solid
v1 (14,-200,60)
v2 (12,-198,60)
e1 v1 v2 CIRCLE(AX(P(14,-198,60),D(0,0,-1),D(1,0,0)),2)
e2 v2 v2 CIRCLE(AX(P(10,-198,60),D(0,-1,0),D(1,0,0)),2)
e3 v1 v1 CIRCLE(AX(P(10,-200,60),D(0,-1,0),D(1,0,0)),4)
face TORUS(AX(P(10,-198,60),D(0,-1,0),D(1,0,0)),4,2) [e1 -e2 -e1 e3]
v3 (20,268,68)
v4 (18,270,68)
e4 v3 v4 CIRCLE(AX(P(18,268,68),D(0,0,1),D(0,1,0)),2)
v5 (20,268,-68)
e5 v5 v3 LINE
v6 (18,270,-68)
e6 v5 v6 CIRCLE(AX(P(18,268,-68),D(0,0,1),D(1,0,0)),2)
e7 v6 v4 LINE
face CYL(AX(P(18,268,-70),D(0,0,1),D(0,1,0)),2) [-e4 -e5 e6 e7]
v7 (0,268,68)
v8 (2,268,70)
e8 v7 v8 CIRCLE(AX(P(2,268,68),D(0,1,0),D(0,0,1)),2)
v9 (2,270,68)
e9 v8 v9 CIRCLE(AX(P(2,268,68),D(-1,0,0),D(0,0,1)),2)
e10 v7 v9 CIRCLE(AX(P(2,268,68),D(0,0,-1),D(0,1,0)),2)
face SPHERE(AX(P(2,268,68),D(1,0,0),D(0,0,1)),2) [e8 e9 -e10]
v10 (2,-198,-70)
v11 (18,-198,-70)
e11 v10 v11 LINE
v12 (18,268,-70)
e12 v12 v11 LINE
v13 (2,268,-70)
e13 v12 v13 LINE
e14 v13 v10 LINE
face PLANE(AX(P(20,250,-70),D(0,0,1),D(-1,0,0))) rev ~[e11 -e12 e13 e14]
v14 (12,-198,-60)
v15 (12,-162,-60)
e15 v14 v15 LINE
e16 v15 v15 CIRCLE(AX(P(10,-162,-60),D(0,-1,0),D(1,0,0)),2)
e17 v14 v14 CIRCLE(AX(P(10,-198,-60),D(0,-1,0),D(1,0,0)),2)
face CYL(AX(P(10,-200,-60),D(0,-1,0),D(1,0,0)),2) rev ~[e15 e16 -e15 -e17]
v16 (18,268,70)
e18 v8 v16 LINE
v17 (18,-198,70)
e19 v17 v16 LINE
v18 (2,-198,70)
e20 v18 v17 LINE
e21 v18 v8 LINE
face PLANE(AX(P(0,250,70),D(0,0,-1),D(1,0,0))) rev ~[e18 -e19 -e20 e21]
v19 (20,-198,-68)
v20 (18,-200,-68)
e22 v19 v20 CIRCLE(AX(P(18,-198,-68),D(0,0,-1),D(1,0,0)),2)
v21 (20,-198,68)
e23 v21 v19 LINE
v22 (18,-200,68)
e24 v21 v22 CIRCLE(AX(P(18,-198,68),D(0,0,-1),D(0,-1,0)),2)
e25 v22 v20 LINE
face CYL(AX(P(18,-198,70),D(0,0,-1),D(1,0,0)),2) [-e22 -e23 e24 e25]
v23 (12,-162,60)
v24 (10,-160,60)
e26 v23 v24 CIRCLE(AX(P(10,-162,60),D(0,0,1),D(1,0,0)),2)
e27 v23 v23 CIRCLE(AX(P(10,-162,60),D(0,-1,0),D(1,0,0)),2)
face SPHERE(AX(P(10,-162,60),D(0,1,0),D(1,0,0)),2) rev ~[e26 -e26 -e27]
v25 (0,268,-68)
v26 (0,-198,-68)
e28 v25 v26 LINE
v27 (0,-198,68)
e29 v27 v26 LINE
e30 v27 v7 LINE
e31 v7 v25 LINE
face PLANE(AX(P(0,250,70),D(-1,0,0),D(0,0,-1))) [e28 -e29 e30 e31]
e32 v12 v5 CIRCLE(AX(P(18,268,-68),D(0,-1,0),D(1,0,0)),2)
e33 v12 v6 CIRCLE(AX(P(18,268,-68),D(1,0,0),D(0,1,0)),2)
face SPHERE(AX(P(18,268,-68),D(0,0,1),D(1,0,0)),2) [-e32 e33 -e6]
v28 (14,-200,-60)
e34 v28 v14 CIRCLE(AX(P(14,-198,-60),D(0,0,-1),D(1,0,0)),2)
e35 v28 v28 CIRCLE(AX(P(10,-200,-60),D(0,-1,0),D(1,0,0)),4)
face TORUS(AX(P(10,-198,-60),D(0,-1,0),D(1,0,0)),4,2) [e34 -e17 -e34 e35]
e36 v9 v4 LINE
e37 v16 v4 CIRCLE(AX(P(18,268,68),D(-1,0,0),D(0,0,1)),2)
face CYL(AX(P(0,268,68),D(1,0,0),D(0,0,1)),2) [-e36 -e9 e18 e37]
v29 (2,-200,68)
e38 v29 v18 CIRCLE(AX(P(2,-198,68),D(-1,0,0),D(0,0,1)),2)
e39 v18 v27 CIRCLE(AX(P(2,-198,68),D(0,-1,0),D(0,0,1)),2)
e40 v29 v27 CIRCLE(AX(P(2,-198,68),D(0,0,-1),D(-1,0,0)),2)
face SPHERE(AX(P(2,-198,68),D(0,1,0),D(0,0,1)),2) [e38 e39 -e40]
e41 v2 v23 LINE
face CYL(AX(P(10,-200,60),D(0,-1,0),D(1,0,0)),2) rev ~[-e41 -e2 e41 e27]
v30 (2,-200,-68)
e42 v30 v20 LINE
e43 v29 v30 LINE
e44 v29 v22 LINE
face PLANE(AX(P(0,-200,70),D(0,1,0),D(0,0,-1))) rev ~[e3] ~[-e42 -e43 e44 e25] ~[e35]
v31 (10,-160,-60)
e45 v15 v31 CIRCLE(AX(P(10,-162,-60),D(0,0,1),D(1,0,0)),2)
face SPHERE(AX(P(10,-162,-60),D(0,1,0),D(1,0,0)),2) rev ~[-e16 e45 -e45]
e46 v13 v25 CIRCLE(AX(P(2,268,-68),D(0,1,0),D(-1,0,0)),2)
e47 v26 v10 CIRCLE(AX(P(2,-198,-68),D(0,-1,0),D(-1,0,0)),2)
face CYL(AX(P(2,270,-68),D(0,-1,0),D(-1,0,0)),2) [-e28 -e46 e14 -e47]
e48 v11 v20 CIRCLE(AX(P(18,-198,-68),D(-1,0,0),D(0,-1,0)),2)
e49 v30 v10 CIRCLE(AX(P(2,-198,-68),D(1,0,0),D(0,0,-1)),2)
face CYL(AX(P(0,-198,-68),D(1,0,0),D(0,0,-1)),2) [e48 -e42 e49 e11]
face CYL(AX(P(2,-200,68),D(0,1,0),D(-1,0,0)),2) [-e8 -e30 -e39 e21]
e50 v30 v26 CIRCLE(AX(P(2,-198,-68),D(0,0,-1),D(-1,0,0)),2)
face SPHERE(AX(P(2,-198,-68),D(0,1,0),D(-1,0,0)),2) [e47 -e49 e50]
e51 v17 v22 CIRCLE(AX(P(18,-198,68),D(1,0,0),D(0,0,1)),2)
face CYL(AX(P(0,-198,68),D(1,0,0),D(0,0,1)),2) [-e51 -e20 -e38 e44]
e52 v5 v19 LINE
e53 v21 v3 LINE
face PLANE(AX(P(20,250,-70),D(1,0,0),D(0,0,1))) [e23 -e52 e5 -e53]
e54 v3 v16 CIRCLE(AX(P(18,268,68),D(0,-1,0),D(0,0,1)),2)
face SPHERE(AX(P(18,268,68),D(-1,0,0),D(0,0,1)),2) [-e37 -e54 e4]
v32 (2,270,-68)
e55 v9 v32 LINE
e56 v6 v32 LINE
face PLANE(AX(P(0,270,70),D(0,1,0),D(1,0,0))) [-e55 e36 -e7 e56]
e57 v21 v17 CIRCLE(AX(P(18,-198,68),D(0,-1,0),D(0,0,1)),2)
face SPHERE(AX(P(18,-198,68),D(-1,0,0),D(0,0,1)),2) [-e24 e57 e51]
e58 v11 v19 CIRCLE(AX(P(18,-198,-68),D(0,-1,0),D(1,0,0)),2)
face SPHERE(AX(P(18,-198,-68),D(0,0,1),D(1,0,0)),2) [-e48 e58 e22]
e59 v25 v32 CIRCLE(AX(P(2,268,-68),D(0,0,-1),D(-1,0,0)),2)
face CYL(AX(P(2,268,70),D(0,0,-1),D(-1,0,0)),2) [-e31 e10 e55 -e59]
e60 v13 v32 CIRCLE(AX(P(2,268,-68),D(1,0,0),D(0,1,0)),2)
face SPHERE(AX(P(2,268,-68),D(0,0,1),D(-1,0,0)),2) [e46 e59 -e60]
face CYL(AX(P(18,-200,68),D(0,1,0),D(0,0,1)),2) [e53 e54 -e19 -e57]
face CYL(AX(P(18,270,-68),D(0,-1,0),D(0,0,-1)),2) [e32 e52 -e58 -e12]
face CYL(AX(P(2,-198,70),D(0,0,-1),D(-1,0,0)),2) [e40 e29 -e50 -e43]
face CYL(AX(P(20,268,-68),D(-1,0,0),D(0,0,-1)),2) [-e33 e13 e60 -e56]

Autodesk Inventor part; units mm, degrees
ref_plane "YZ Plane" through (0, 0, 0) normal (1, 0, 0) x (0, 1, 0)
ref_plane "XZ Plane" through (0, 0, 0) normal (0, 1, 0) x (-1, 0, 0)
ref_plane "XY Plane" through (0, 0, 0) normal (0, 0, 1) x (1, 0, 0)
sketch "草图1" plane through (0, 0, 0) normal (0, 0, 1) x (1, 0, 0)
  point P0 (0, 0)
sketch "草图2" plane through (0, 0, 0) normal (1, 0, 0) x (0, 1, 0)
  line L0 (200, 70) -> (-200, 70)
  line L1 (-200, 70) -> (-200, -70)
  line L2 (-200, -70) -> (200, -70)
  line L3 (200, -70) -> (200, 70)
  point P0 (0, 0)
  dimension "d0" = 400
  dimension "d1" = 140
extrude "拉伸1" add sketch "草图2" along normal blind 20
sketch "草图3" plane through (0, -200, -70) normal (0, -1, 0) x (1, 0, 0)
  circle A0 centre (10, 10) radius 2
  point P0 (0, 70)
  dimension "d4" = 4
extrude "拉伸2" cut sketch "草图3" against normal blind 40
sketch "草图4" plane through (0, -200, -70) normal (0, -1, 0) x (1, 0, 0)
  circle A0 centre (10, 130) radius 2
  point P0 (0, 70)
  dimension "d7" = 4
extrude "拉伸3" cut sketch "草图4" against normal blind 40
sketch "草图5" plane through (0, 200, 70) normal (0, 1, 0) x (1, 0, 0)
  line L0 (20, 0) -> (20, 140) projected
  line L1 (20, 140) -> (0, 140)
  line L2 (0, 140) -> (0, 0)
  line L3 (0, 0) -> (20, 0)
  line L4 (20, 0) -> (20, 140)
  point P0 (0, 70)
extrude "拉伸4" add sketch "草图5" along normal blind 50
sketch "草图6" plane through (0, 250, 70) normal (0, 1, 0) x (1, 0, 0)
  line L0 (0, 0) -> (20, 0) projected
  line L1 (20, 140) -> (0, 140) projected
  line L2 (20, 0) -> (0, 0)
  line L3 (0, 0) -> (0, 140)
  line L4 (0, 140) -> (20, 140)
  line L5 (20, 140) -> (20, 0)
  point P0 (0, 70)
extrude "拉伸5" add sketch "草图6" along normal blind 20
fillet "圆角1" radius 2 2 edges at (8, -160, 60) (8, -160, -60)
fillet "圆角1" radius 2 14 edges at (10, 270, 70) (0, 35, 70) (10, -200, 70) (20, 35, 70) (20, 270, 0) (20, -200, 0) (20, 35, -70) (0, 270, 0) (0, 35, -70) (0, -200, 0) (10, 270, -70) (10, -200, -70) (8, -200, 60) (8, -200, -60)
properties part number "内层侧板"
